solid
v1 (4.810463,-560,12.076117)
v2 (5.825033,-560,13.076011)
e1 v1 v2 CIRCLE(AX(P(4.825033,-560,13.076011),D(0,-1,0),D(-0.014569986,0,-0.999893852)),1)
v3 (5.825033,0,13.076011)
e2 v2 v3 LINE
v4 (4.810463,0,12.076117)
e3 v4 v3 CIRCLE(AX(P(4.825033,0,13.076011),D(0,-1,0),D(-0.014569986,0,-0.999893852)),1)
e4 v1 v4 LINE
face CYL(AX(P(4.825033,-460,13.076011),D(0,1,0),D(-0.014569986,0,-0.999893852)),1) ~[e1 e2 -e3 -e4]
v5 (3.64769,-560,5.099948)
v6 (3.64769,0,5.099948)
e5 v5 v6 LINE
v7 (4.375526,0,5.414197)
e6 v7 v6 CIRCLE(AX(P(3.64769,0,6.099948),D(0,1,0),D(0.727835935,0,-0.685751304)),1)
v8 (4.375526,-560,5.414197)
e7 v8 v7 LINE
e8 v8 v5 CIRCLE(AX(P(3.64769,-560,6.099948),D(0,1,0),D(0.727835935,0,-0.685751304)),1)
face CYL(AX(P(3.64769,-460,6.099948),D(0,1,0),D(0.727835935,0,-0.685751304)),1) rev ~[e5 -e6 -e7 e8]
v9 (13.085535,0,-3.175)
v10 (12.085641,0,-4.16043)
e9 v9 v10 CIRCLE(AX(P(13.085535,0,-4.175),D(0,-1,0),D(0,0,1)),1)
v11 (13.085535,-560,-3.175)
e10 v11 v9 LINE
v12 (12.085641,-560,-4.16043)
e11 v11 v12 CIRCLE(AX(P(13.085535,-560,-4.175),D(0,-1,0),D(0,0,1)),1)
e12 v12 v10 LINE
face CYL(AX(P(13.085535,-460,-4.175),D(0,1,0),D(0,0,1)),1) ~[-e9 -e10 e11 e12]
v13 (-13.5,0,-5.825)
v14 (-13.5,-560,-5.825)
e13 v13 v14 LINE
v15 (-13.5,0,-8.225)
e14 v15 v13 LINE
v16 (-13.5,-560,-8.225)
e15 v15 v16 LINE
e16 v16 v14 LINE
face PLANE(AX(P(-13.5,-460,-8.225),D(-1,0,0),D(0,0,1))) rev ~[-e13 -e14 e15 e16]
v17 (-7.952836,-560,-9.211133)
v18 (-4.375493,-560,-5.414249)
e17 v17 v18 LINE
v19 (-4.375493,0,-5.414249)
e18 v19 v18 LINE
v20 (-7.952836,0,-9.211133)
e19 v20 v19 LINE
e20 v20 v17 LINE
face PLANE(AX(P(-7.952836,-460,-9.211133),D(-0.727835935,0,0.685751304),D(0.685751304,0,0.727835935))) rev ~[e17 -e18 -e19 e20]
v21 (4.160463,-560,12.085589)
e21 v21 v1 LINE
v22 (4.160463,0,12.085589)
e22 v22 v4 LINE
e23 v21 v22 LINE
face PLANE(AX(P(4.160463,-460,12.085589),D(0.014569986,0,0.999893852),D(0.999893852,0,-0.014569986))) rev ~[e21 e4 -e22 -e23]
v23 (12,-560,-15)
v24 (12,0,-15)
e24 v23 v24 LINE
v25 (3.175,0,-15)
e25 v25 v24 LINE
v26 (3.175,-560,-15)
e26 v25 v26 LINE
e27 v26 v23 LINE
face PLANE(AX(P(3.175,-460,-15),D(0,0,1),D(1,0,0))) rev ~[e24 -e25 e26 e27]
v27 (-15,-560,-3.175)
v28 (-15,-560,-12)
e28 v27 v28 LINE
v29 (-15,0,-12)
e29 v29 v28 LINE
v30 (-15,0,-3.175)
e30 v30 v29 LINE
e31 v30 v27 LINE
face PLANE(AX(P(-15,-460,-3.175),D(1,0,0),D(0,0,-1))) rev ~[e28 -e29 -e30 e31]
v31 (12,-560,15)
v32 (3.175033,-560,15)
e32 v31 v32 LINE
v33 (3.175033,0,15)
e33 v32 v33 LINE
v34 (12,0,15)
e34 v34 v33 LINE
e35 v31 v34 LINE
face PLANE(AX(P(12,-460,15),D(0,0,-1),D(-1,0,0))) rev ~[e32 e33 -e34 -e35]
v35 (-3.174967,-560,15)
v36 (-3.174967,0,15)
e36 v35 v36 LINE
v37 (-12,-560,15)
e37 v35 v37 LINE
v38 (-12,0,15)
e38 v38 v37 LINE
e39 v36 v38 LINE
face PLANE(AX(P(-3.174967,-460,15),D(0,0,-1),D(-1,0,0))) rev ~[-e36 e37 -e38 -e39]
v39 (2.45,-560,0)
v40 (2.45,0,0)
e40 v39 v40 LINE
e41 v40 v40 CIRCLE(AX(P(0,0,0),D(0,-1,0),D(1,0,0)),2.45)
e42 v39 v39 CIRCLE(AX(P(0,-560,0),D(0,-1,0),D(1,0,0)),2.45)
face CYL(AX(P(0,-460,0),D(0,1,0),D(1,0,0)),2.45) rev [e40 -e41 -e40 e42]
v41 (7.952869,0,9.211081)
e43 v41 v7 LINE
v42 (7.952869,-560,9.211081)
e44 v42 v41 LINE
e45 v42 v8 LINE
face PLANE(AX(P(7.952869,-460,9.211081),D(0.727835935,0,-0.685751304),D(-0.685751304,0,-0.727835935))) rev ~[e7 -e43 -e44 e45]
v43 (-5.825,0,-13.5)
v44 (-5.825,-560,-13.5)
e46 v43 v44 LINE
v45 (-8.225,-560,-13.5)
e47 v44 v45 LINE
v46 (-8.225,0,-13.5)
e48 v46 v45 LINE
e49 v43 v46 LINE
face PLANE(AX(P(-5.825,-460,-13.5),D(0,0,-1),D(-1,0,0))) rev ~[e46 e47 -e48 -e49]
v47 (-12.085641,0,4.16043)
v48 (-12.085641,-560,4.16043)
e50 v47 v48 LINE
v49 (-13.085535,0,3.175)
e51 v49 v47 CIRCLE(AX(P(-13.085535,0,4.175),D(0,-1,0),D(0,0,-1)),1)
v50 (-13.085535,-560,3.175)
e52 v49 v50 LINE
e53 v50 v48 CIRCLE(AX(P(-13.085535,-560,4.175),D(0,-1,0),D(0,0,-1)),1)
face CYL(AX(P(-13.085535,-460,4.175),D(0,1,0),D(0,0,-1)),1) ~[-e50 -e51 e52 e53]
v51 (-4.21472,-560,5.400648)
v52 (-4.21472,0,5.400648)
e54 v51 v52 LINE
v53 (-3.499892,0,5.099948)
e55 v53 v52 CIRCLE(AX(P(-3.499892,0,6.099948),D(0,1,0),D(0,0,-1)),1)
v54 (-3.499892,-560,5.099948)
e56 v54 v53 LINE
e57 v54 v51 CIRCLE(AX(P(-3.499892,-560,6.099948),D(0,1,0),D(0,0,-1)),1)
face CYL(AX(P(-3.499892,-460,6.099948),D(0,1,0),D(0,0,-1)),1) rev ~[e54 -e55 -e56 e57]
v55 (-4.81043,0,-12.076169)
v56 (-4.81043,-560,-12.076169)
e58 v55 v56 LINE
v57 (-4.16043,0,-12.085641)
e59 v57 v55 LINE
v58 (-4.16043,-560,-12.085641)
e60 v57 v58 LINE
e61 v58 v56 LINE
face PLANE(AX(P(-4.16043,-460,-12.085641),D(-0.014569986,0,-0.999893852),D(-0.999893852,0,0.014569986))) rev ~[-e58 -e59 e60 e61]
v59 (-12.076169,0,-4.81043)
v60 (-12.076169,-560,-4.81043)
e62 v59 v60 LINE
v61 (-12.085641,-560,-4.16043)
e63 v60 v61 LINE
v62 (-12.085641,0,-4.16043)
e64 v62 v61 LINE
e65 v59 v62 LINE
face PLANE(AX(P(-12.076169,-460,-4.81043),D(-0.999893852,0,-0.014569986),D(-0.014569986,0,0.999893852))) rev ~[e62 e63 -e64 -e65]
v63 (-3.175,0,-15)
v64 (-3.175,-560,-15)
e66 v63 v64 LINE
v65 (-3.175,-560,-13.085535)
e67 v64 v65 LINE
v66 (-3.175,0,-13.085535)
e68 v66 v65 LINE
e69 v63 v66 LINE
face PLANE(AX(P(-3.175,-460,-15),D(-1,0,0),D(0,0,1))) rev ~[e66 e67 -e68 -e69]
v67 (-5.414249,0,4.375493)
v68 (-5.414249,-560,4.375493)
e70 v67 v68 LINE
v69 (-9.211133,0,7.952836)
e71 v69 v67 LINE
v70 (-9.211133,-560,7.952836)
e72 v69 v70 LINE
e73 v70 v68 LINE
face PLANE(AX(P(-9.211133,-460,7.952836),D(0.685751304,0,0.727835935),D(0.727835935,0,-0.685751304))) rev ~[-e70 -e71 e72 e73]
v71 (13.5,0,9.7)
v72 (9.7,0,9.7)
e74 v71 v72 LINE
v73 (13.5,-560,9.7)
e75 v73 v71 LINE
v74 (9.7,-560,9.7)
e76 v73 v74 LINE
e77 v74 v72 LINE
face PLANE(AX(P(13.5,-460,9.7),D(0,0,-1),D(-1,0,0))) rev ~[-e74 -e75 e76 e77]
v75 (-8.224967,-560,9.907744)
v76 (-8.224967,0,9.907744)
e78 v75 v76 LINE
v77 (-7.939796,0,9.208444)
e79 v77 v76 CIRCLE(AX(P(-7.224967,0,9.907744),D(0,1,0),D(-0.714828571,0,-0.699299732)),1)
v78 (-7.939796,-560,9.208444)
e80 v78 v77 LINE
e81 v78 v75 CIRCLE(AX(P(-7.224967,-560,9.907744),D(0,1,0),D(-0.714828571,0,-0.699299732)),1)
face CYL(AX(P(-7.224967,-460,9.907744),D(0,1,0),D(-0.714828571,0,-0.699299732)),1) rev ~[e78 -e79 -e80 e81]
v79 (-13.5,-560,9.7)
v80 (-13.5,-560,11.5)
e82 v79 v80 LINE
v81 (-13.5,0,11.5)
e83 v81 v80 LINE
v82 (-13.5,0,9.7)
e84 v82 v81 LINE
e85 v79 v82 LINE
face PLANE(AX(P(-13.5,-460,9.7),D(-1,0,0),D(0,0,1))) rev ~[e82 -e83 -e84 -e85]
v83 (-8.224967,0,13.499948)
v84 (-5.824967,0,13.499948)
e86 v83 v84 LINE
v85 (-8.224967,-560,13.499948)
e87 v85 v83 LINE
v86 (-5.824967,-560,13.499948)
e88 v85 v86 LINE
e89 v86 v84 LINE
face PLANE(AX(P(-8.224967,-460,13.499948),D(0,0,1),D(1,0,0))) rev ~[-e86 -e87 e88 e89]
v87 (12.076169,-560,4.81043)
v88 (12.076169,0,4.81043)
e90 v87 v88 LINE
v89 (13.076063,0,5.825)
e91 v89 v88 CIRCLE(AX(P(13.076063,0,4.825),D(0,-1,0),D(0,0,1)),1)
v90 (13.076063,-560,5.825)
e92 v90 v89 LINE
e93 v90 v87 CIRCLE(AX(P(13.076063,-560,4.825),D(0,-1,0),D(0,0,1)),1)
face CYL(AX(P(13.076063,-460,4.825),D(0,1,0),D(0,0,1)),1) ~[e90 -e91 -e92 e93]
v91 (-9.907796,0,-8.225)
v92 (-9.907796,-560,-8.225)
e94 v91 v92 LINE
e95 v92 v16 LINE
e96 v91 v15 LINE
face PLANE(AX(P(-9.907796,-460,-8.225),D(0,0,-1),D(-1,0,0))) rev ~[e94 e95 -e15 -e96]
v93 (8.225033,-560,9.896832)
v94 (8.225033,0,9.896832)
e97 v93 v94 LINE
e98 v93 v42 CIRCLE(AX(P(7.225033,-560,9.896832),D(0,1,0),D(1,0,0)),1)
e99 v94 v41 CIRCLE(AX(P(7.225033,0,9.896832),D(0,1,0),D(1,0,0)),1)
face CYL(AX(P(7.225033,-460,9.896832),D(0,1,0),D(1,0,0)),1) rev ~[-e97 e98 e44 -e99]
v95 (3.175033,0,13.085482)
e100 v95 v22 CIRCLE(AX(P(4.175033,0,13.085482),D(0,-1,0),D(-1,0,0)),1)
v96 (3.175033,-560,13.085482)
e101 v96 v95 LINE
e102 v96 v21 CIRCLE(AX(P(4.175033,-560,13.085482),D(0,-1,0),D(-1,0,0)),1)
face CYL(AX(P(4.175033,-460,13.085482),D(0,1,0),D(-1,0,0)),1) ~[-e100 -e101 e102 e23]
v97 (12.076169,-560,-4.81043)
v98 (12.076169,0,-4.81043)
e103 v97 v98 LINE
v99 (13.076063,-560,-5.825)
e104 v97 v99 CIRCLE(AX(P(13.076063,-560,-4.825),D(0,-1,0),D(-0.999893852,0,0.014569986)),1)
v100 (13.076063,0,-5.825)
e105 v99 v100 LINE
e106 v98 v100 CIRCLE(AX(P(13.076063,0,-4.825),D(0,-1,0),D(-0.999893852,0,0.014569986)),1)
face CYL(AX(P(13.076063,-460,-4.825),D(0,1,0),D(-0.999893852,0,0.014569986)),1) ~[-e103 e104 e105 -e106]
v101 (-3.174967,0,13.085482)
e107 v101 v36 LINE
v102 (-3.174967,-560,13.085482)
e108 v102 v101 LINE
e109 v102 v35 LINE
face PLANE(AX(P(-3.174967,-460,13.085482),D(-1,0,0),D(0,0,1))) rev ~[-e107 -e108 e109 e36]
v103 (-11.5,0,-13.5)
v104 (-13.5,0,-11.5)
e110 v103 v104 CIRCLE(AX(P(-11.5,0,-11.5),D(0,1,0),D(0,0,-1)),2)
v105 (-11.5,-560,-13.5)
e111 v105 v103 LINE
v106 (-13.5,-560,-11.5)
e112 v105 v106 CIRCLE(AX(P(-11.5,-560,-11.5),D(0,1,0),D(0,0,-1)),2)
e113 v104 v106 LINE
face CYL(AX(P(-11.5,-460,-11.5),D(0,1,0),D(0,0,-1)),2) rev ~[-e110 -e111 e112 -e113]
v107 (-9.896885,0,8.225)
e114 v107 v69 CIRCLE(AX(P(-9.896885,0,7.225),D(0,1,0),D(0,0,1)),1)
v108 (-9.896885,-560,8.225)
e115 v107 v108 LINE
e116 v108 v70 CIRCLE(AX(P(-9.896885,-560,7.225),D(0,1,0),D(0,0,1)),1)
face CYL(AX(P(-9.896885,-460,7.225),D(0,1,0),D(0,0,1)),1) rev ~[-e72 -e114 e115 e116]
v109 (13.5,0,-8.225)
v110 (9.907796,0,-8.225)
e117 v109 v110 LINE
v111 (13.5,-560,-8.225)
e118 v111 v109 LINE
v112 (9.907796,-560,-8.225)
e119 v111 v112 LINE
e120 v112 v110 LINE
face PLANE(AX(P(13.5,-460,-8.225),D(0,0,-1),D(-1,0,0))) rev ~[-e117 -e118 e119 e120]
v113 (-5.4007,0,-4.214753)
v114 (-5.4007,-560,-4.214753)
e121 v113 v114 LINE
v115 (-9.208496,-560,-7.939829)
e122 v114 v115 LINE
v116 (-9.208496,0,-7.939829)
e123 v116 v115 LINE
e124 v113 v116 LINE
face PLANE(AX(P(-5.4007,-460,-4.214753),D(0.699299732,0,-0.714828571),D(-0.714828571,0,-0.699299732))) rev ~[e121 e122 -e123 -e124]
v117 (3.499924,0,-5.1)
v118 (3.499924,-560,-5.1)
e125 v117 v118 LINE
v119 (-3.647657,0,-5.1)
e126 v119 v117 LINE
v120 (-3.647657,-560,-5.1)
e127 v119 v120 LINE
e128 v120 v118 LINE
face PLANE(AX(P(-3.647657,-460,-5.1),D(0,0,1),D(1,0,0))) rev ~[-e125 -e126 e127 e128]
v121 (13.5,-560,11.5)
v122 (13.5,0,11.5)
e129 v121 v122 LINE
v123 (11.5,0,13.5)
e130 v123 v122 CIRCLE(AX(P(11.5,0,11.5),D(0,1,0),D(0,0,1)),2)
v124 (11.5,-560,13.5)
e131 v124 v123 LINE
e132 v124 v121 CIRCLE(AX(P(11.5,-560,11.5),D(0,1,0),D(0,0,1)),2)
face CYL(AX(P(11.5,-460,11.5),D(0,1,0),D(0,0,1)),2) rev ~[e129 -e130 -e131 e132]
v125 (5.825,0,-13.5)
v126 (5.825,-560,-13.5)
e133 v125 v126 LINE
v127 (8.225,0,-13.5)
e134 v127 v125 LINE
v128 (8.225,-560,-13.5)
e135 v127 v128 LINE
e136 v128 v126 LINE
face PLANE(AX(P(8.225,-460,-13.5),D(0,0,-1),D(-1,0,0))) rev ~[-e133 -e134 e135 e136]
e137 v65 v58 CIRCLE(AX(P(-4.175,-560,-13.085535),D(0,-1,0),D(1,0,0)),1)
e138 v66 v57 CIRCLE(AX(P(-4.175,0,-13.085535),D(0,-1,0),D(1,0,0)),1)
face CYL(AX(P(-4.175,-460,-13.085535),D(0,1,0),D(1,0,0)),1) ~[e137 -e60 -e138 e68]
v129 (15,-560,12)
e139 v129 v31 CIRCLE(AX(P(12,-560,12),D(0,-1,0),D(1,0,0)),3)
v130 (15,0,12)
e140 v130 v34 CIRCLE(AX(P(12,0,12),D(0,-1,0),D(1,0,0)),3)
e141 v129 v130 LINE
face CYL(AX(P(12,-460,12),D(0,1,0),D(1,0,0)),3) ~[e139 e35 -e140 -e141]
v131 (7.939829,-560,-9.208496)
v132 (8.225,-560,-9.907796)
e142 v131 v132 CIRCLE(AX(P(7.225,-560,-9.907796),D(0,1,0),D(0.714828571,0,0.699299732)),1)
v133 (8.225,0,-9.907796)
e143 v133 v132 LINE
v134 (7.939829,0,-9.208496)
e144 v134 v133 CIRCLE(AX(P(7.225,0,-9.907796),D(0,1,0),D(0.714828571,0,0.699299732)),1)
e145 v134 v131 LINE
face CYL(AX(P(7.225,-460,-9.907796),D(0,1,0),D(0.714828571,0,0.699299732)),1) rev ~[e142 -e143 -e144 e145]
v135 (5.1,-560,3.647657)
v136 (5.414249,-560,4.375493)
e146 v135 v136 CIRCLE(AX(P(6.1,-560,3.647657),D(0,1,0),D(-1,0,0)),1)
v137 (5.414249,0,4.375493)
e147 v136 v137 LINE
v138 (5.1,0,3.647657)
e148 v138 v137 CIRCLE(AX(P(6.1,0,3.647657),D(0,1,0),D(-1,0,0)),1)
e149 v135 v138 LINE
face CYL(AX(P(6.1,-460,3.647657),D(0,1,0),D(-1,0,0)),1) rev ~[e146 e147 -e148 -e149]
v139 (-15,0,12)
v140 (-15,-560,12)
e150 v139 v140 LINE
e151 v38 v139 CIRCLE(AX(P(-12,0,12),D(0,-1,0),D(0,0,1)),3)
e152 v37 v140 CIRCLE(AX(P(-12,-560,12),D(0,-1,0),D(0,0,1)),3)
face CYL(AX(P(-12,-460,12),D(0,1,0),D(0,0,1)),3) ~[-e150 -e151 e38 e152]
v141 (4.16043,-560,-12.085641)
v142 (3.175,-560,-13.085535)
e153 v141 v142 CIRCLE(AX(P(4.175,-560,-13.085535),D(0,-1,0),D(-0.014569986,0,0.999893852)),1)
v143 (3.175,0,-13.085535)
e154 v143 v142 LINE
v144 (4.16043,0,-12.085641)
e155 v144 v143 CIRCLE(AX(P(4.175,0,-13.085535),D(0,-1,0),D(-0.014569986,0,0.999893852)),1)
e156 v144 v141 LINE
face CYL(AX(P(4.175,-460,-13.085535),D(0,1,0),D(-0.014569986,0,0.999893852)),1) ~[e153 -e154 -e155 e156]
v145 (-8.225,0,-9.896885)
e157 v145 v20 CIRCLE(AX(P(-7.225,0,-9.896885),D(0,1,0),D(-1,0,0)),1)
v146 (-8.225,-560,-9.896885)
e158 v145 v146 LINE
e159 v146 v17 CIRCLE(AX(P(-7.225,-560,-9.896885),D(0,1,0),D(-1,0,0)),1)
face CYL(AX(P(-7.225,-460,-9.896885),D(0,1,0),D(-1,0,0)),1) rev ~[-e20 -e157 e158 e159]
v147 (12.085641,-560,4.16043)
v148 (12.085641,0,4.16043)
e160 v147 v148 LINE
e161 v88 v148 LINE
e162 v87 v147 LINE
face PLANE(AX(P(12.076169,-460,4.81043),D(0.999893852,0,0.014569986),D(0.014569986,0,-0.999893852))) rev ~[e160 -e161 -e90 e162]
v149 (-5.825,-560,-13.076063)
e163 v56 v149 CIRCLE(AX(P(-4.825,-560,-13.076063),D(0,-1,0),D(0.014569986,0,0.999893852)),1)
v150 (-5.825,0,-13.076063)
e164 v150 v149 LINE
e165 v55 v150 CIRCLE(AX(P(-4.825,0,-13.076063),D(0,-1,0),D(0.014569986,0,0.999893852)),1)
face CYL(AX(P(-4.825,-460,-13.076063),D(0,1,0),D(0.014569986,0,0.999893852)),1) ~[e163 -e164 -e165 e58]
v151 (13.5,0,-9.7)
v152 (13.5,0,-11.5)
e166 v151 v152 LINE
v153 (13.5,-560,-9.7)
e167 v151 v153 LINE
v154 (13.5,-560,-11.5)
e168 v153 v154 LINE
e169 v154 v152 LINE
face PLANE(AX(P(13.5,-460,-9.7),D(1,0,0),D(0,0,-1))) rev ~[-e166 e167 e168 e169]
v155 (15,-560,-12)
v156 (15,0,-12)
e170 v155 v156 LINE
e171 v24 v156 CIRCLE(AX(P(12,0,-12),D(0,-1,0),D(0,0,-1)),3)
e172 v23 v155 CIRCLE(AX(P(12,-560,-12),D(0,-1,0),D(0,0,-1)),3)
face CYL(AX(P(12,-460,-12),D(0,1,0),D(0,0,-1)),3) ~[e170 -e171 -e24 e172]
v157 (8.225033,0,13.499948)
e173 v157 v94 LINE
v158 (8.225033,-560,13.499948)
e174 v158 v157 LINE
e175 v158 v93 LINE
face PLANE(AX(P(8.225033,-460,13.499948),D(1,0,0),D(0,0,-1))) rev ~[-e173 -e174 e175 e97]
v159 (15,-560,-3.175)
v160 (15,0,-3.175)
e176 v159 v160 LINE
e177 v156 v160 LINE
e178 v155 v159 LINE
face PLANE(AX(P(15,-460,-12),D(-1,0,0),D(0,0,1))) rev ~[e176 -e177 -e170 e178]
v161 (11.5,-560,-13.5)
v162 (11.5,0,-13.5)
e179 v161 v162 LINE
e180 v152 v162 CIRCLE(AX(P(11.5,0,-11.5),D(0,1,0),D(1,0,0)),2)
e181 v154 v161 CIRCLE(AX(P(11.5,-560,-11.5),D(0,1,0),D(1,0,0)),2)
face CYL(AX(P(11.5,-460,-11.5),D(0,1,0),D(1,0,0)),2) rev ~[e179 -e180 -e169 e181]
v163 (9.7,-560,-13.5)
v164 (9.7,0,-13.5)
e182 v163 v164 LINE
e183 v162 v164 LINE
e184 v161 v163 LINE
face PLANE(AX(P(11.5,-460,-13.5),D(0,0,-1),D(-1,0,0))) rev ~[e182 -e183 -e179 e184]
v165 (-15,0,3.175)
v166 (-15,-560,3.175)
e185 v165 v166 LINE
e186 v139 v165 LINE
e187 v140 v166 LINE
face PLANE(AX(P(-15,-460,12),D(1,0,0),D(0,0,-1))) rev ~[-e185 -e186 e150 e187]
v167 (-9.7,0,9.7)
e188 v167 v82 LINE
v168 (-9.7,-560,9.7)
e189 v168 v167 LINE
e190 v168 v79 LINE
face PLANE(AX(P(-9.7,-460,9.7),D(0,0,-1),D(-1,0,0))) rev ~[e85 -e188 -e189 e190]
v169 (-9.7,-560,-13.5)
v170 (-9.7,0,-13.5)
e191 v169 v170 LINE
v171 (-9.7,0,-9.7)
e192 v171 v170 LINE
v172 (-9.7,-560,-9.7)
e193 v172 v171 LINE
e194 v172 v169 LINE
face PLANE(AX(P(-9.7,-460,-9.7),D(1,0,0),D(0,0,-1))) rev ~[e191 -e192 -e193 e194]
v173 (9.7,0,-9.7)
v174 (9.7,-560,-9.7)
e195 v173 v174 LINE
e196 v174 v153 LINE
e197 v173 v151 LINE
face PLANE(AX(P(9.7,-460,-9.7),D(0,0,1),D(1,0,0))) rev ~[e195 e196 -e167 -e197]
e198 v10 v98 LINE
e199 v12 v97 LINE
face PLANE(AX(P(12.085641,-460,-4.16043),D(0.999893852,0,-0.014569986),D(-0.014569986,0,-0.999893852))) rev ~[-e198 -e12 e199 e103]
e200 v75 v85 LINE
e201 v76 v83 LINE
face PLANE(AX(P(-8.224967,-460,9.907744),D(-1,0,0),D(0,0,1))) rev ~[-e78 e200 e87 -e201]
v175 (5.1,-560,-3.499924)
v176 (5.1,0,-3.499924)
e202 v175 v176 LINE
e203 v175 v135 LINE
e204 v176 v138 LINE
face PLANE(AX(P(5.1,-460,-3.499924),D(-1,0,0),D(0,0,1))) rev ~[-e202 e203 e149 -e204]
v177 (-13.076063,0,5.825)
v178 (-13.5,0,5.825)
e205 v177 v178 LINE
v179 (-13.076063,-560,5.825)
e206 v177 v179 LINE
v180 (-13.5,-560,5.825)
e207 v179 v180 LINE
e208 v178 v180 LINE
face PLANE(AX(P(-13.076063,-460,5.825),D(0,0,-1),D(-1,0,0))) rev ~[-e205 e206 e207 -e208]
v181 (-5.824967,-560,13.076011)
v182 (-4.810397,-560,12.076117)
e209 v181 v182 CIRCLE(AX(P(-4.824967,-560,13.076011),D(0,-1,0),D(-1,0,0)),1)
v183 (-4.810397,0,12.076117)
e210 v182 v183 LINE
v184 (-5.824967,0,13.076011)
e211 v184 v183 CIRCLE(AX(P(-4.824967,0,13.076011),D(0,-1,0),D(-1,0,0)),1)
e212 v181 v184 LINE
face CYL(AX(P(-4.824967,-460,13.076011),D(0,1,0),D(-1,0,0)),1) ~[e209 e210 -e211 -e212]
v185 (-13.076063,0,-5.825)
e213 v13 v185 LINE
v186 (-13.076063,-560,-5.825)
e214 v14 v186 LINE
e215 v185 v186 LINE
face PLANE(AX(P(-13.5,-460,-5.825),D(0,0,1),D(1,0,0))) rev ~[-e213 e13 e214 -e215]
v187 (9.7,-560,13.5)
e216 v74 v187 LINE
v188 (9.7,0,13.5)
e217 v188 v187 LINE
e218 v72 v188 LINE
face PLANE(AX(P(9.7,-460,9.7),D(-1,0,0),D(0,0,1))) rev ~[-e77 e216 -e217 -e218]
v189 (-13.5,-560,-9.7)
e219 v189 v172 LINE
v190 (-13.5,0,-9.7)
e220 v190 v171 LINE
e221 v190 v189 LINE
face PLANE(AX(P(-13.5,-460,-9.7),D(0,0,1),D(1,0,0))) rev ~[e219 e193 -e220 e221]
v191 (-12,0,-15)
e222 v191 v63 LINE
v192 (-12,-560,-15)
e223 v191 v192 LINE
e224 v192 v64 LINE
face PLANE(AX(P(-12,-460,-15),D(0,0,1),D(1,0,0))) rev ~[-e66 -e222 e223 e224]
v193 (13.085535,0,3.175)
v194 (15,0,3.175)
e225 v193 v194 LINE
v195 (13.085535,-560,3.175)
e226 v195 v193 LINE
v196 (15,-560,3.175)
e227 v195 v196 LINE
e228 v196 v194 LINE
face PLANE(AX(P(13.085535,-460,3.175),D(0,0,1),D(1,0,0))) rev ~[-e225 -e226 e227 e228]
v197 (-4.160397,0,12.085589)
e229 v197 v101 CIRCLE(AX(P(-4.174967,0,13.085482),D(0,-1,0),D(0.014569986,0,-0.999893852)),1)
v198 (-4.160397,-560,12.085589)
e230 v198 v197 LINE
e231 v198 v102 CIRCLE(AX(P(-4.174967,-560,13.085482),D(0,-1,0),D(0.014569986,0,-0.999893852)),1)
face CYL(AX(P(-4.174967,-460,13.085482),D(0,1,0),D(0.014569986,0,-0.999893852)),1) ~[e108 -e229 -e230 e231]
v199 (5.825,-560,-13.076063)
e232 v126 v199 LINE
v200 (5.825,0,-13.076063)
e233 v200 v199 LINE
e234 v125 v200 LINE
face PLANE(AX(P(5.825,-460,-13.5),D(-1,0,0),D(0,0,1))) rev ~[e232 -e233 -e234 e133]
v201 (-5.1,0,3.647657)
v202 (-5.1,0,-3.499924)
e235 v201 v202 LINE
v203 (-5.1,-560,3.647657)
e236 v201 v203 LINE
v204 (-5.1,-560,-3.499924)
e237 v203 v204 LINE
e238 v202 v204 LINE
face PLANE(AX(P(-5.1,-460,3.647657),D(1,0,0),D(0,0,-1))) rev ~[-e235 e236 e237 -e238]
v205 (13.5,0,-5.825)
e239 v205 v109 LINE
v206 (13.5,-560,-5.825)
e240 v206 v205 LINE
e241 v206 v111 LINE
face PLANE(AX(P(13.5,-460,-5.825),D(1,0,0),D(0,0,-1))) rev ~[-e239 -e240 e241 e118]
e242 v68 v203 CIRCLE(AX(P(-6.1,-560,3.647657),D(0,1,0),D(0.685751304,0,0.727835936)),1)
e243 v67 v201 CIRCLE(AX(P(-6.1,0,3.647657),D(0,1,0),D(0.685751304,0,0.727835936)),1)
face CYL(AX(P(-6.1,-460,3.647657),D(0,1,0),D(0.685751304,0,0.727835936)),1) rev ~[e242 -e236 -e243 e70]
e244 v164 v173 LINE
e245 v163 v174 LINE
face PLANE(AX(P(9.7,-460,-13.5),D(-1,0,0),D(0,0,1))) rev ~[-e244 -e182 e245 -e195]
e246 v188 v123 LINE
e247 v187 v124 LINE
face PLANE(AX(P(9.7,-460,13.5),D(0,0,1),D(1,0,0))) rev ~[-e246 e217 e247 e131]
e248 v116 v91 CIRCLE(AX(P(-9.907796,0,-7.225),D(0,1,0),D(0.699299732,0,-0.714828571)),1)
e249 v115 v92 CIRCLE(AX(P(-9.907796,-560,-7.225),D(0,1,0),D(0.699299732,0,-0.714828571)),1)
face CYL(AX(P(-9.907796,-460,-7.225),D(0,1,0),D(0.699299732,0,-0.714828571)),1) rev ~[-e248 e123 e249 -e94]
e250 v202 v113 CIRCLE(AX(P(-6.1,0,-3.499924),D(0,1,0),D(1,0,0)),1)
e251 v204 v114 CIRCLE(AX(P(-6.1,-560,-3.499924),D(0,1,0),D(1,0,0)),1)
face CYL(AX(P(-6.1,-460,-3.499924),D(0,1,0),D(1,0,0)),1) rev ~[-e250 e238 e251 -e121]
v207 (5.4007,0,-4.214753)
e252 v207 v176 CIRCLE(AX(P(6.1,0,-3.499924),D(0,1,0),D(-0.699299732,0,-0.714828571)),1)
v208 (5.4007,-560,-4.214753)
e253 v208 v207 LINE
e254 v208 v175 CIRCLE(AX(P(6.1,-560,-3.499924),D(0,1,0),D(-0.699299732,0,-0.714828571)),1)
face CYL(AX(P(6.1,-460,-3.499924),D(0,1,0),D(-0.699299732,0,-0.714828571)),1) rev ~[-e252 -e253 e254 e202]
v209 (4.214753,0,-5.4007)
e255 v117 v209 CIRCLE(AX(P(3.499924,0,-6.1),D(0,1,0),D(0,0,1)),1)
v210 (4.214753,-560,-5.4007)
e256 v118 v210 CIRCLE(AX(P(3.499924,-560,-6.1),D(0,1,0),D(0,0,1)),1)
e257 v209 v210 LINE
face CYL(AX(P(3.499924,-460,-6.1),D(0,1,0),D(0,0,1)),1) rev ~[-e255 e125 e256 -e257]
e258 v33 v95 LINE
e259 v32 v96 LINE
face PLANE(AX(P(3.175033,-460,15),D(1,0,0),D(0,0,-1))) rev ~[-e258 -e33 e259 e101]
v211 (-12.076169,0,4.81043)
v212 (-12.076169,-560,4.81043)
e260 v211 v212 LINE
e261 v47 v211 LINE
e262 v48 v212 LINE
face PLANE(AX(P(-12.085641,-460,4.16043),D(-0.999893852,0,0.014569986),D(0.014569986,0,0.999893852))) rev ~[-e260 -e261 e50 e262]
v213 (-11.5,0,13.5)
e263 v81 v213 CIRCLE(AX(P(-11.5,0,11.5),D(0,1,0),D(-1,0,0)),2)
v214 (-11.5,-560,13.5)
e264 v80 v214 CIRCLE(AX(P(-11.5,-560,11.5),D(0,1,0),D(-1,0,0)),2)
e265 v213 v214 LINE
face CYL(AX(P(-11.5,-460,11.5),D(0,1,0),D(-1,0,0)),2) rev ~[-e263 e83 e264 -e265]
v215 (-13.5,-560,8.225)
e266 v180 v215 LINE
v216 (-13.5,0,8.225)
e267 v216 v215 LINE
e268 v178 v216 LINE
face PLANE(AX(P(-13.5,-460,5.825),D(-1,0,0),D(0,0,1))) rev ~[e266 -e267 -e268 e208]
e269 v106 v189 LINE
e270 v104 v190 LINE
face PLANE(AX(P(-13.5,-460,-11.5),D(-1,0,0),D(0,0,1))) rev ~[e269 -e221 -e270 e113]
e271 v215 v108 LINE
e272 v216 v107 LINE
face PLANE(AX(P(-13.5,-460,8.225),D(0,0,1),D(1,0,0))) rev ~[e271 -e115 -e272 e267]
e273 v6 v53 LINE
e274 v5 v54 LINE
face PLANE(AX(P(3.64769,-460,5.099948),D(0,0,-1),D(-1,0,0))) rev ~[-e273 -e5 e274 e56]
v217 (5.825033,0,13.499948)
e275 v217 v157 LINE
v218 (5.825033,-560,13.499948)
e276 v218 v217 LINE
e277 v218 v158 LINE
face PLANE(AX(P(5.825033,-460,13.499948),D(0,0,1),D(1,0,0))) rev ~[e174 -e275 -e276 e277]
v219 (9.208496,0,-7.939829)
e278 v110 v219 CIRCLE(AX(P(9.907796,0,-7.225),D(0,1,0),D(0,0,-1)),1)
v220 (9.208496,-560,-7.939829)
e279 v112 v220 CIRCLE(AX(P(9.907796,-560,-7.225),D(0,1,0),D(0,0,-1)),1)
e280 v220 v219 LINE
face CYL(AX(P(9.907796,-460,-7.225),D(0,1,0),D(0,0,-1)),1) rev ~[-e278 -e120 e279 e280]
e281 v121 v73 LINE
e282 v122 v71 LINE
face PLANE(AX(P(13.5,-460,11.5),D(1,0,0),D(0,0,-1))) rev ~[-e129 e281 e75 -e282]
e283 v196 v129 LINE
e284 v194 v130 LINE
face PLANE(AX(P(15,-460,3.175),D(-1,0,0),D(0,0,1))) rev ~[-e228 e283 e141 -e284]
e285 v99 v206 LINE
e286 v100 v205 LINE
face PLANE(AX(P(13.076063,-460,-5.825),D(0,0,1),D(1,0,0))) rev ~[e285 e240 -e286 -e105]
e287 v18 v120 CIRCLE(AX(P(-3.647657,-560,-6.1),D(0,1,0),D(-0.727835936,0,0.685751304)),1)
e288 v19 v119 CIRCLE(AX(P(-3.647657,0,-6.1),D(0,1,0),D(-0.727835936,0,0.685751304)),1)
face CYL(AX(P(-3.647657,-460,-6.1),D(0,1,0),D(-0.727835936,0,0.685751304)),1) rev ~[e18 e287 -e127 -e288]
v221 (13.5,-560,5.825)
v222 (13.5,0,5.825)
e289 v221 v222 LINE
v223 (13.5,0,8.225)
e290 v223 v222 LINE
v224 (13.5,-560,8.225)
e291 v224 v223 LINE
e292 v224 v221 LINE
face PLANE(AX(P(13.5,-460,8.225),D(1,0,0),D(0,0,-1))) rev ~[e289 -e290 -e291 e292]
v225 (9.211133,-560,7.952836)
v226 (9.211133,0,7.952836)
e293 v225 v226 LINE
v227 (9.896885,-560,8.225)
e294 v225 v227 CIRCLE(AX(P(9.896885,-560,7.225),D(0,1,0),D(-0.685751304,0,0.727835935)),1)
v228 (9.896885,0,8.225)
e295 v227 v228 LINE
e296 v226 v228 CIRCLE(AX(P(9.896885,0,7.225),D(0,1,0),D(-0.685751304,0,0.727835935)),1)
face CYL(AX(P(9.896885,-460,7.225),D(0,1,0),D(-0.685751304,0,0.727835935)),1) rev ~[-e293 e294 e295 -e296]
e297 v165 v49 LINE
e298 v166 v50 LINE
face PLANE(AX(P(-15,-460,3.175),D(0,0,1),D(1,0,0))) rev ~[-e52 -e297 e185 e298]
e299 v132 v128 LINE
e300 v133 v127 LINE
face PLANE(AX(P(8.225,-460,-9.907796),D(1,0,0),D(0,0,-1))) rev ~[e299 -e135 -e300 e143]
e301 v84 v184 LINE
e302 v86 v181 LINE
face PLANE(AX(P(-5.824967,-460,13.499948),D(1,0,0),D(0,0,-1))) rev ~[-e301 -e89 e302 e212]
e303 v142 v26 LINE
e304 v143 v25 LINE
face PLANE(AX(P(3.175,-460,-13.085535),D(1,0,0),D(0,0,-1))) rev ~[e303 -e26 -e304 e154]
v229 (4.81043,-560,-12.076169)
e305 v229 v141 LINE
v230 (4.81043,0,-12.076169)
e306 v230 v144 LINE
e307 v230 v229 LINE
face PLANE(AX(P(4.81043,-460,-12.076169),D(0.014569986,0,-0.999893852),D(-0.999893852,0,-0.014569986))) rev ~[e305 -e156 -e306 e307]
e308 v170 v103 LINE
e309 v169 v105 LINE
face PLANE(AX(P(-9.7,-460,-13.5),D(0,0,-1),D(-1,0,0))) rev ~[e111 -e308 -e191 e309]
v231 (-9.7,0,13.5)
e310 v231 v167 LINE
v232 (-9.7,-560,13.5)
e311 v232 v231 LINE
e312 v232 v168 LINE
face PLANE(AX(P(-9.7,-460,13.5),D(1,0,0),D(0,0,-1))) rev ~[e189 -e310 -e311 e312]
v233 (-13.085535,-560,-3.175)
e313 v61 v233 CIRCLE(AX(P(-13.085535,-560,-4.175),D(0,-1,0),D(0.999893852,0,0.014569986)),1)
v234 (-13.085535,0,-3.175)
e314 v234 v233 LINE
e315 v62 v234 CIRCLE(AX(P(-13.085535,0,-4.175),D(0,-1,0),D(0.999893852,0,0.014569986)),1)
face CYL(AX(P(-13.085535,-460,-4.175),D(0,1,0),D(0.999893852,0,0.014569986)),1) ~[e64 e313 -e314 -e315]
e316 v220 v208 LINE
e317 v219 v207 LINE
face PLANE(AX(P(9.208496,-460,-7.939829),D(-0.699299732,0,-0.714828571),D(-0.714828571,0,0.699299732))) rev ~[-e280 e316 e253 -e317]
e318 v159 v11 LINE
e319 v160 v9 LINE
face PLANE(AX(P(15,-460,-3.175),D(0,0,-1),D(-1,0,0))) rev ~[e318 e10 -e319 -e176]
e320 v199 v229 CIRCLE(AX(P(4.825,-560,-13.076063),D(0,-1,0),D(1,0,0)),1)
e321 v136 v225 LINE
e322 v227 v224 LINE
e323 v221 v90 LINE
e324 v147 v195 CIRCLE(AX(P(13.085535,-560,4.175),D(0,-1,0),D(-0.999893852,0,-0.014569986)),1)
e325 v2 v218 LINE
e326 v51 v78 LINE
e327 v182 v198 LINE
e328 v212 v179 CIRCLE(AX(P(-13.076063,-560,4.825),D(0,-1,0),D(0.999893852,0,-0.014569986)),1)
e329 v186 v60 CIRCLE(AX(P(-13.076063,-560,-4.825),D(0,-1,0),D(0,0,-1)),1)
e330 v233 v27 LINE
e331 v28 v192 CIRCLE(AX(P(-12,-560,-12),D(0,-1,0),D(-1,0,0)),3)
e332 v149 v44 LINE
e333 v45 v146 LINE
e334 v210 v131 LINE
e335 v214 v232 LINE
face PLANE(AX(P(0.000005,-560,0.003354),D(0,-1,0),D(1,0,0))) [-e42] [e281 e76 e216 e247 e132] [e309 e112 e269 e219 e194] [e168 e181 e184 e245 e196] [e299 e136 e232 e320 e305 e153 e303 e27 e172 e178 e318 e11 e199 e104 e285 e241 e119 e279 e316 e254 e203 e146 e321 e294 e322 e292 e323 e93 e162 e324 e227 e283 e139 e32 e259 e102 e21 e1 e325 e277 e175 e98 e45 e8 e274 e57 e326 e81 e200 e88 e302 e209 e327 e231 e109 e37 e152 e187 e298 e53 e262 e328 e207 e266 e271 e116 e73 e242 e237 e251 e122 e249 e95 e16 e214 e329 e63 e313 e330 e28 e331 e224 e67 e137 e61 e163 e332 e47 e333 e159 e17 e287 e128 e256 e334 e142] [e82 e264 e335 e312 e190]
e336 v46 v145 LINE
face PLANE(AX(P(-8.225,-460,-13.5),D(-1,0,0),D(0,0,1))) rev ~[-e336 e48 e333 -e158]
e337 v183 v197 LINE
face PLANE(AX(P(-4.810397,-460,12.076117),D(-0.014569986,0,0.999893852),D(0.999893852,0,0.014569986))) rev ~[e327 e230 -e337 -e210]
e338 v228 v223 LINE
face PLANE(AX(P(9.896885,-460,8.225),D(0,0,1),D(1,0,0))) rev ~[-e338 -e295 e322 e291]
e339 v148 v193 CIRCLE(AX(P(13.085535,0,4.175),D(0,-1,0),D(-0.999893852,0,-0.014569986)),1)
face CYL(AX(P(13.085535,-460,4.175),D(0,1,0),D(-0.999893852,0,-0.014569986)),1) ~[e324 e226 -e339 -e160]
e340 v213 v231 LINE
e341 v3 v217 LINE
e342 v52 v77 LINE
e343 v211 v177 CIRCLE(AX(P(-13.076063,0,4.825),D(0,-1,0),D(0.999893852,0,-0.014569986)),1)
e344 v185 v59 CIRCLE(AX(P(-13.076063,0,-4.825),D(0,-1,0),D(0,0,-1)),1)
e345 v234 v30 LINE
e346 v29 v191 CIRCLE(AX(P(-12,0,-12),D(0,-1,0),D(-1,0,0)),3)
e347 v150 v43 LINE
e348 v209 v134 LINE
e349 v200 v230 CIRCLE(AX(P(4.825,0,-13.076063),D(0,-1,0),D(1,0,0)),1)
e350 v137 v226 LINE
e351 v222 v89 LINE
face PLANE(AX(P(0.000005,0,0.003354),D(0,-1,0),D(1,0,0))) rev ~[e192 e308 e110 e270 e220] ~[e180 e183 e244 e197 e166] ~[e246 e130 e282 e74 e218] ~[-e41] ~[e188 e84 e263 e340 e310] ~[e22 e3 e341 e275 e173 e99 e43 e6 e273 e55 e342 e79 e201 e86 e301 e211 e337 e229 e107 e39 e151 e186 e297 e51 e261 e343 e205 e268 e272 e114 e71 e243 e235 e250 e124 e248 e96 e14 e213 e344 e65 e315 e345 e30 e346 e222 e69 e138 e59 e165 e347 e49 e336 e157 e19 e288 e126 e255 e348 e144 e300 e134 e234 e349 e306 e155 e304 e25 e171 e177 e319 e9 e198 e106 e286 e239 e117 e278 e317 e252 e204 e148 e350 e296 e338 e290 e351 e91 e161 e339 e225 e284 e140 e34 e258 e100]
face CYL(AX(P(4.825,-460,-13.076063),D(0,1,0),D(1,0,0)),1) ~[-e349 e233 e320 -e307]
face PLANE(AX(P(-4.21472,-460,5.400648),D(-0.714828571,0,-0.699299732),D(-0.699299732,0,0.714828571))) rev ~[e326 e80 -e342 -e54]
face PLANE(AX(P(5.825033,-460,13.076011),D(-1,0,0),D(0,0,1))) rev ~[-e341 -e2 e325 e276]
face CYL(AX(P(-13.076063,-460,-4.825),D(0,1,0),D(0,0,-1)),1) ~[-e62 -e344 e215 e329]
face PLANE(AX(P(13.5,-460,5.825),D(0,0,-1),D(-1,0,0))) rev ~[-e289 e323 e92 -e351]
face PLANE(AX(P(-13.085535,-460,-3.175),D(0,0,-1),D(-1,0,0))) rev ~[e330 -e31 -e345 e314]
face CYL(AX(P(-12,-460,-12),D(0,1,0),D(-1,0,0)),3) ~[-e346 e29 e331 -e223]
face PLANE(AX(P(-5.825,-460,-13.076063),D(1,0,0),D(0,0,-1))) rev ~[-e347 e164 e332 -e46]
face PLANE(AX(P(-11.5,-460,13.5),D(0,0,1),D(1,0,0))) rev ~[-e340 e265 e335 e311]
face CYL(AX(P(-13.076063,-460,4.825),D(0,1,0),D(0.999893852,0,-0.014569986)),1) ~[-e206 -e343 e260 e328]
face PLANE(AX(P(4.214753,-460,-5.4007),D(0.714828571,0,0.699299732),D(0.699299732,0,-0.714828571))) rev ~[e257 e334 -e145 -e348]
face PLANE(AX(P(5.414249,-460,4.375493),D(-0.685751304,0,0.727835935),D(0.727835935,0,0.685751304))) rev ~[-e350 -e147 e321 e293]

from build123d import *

# Parameters (mm, degrees)
F0_R     = 2.45
F1_DEPTH = 460
F2_DEPTH = 100


# Not quite as in the source:
# - ends of sketch curves that miss each other by under 0.0002 mm in the source are joined


with BuildPart() as f1:
    # F0 (on Front) → F1 (new body)
    with BuildSketch(Plane.XZ):
        with BuildLine():
            Line((-3.1749674082, 15), (-12, 15))
            ThreePointArc((-12, 15), (-14.1213203436, 14.1213203436), (-15, 12))
            Line((-15, 12), (-15, 3.175))
            Line((-15, 3.175), (-13.0855346263, 3.175))
            ThreePointArc((-13.0855346263, 3.175), (-12.3835980145, 3.4627605788), (-12.0856407741, 4.1604300138))
            Line((-12.0856407741, 4.1604300138), (-12.0761692778, 4.8104300138))
            ThreePointArc((-12.0761692778, 4.8104300138), (-12.3638237087, 5.5269366118), (-13.0760631299, 5.825))
            Line((-13.0760631299, 5.825), (-13.5, 5.825))
            Line((-13.5, 5.825), (-13.5, 8.225))
            Line((-13.5, 8.225), (-9.8968845016, 8.225))
            ThreePointArc((-9.8968845016, 8.225), (-9.5279915195, 8.1544718757), (-9.2111331975, 7.9528359354))
            Line((-9.2111331975, 7.9528359354), (-5.4142486959, 4.3754933338))
            ThreePointArc((-5.4142486959, 4.3754933338), (-5.1819174045, 4.0440465354), (-5.1, 3.6476573984))
            Line((-5.1, 3.6476573984), (-5.1, -3.4999243287))
            ThreePointArc((-5.1, -3.4999243287), (-5.1782354607, -3.8876744211), (-5.4007002683, -4.2147528992))
            Line((-5.4007002683, -4.2147528992), (-9.2084959767, -7.9398285705))
            ThreePointArc((-9.2084959767, -7.9398285705), (-9.5301904718, -8.1509666761), (-9.9077957084, -8.225))
            Line((-9.9077957084, -8.225), (-13.5, -8.225))
            Line((-13.5, -8.225), (-13.5, -5.825))
            Line((-13.5, -5.825), (-13.0760631299, -5.825))
            ThreePointArc((-13.0760631299, -5.825), (-12.3638237087, -5.5269366118), (-12.0761692778, -4.8104300138))
            Line((-12.0761692778, -4.8104300138), (-12.0856407741, -4.1604300138))
            ThreePointArc((-12.0856407741, -4.1604300138), (-12.3835980145, -3.4627605788), (-13.0855346263, -3.175))
            Line((-13.0855346263, -3.175), (-15, -3.175))
            Line((-15, -3.175), (-15, -12))
            ThreePointArc((-15, -12), (-14.1213203436, -14.1213203436), (-12, -15))
            Line((-12, -15), (-3.175, -15))
            Line((-3.175, -15), (-3.175, -13.0855346263))
            ThreePointArc((-3.175, -13.0855346263), (-3.4627605788, -12.3835980145), (-4.1604300138, -12.0856407741))
            Line((-4.1604300138, -12.0856407741), (-4.8104300138, -12.0761692778))
            ThreePointArc((-4.8104300138, -12.0761692778), (-5.5269366118, -12.3638237087), (-5.825, -13.0760631299))
            Line((-5.825, -13.0760631299), (-5.825, -13.5))
            Line((-5.825, -13.5), (-8.225, -13.5))
            Line((-8.225, -13.5), (-8.225, -9.8968845016))
            ThreePointArc((-8.225, -9.8968845016), (-8.1544718757, -9.5279915195), (-7.9528359354, -9.2111331975))
            Line((-7.9528359354, -9.2111331975), (-4.3754933338, -5.4142486959))
            ThreePointArc((-4.3754933338, -5.4142486959), (-4.0440465354, -5.1819174045), (-3.6476573984, -5.1))
            Line((-3.6476573984, -5.1), (3.4999243287, -5.1))
            ThreePointArc((3.4999243287, -5.1), (3.8876744211, -5.1782354607), (4.2147528992, -5.4007002683))
            Line((4.2147528992, -5.4007002683), (7.9398285705, -9.2084959767))
            ThreePointArc((7.9398285705, -9.2084959767), (8.1509666761, -9.5301904718), (8.225, -9.9077957084))
            Line((8.225, -9.9077957084), (8.225, -13.5))
            Line((8.225, -13.5), (5.825, -13.5))
            Line((5.825, -13.5), (5.825, -13.0760631299))
            ThreePointArc((5.825, -13.0760631299), (5.5269366118, -12.3638237087), (4.8104300138, -12.0761692778))
            Line((4.8104300138, -12.0761692778), (4.1604300138, -12.0856407741))
            ThreePointArc((4.1604300138, -12.0856407741), (3.4627605788, -12.3835980145), (3.175, -13.0855346263))
            Line((3.175, -13.0855346263), (3.175, -15))
            Line((3.175, -15), (12, -15))
            ThreePointArc((12, -15), (14.1213203436, -14.1213203436), (15, -12))
            Line((15, -12), (15, -3.175))
            Line((15, -3.175), (13.0855346263, -3.175))
            ThreePointArc((13.0855346263, -3.175), (12.3835980145, -3.4627605788), (12.0856407741, -4.1604300138))
            Line((12.0856407741, -4.1604300138), (12.0761692778, -4.8104300138))
            ThreePointArc((12.0761692778, -4.8104300138), (12.3638237087, -5.5269366118), (13.0760631299, -5.825))
            Line((13.0760631299, -5.825), (13.5, -5.825))
            Line((13.5, -5.825), (13.5, -8.225))
            Line((13.5, -8.225), (9.9077957084, -8.225))
            ThreePointArc((9.9077957084, -8.225), (9.5301904718, -8.1509666761), (9.2084959767, -7.9398285705))
            Line((9.2084959767, -7.9398285705), (5.4007002683, -4.2147528992))
            ThreePointArc((5.4007002683, -4.2147528992), (5.1782354607, -3.8876744211), (5.1, -3.4999243287))
            Line((5.1, -3.4999243287), (5.1, 3.6476573984))
            ThreePointArc((5.1, 3.6476573984), (5.1819174045, 4.0440465354), (5.4142486959, 4.3754933338))
            Line((5.4142486959, 4.3754933338), (9.2111331975, 7.9528359354))
            ThreePointArc((9.2111331975, 7.9528359354), (9.5279915195, 8.1544718757), (9.8968845016, 8.225))
            Line((9.8968845016, 8.225), (13.5, 8.225))
            Line((13.5, 8.225), (13.5, 5.825))
            Line((13.5, 5.825), (13.0760631299, 5.825))
            ThreePointArc((13.0760631299, 5.825), (12.3638237087, 5.5269366118), (12.0761692778, 4.8104300138))
            Line((12.0761692778, 4.8104300138), (12.0856407741, 4.1604300138))
            ThreePointArc((12.0856407741, 4.1604300138), (12.3835980145, 3.4627605788), (13.0855346263, 3.175))
            Line((13.0855346263, 3.175), (15, 3.175))
            Line((15, 3.175), (15, 12))
            ThreePointArc((15, 12), (14.1213203436, 14.1213203436), (12, 15))
            Line((12, 15), (3.1750325918, 15))
            Line((3.1750325918, 15), (3.1750325918, 13.0854824722))
            ThreePointArc((3.1750325918, 13.0854824722), (3.4627931706, 12.3835458604), (4.1604626057, 12.0855886201))
            Line((4.1604626057, 12.0855886201), (4.8104626057, 12.0761171237))
            ThreePointArc((4.8104626057, 12.0761171237), (5.5269692036, 12.3637715546), (5.8250325918, 13.0760109758))
            Line((5.8250325918, 13.0760109758), (5.8250325918, 13.4999478459))
            Line((5.8250325918, 13.4999478459), (8.2250325918, 13.4999478459))
            Line((8.2250325918, 13.4999478459), (8.2250325918, 9.8968323476))
            ThreePointArc((8.2250325918, 9.8968323476), (8.1545044675, 9.5279393654), (7.9528685272, 9.2110810434))
            Line((7.9528685272, 9.2110810434), (4.3755259256, 5.4141965418))
            ThreePointArc((4.3755259256, 5.4141965418), (4.0440791272, 5.1818652505), (3.6476899902, 5.0999478459))
            Line((3.6476899902, 5.0999478459), (-3.4998917369, 5.0999478459))
            ThreePointArc((-3.4998917369, 5.0999478459), (-3.8876418293, 5.1781833067), (-4.2147203074, 5.4006481142))
            Line((-4.2147203074, 5.4006481142), (-7.9397959787, 9.2084438226))
            ThreePointArc((-7.9397959787, 9.2084438226), (-8.1509340843, 9.5301383177), (-8.2249674082, 9.9077435543))
            Line((-8.2249674082, 9.9077435543), (-8.2249674082, 13.4999478459))
            Line((-8.2249674082, 13.4999478459), (-5.8249674082, 13.4999478459))
            Line((-5.8249674082, 13.4999478459), (-5.8249674082, 13.0760109758))
            ThreePointArc((-5.8249674082, 13.0760109758), (-5.5269040199, 12.3637715546), (-4.810397422, 12.0761171237))
            Line((-4.810397422, 12.0761171237), (-4.160397422, 12.0855886201))
            ThreePointArc((-4.160397422, 12.0855886201), (-3.462727987, 12.3835458604), (-3.1749674082, 13.0854824722))
            Line((-3.1749674082, 13.0854824722), (-3.1749674082, 15))
        make_face()
        with BuildLine():
            Line((-13.5, -11.5), (-13.5, -9.7))
            Line((-13.5, -9.7), (-9.7, -9.7))
            Line((-9.7, -9.7), (-9.7, -13.5))
            Line((-9.7, -13.5), (-11.5, -13.5))
            ThreePointArc((-11.5, -13.5), (-12.9142135624, -12.9142135624), (-13.5, -11.5))
        make_face(mode=Mode.SUBTRACT)
        with BuildLine():
            Line((9.7, -9.7), (13.5, -9.7))
            Line((13.5, -9.7), (13.5, -11.5))
            ThreePointArc((13.5, -11.5), (12.9142135624, -12.9142135624), (11.5, -13.5))
            Line((11.5, -13.5), (9.7, -13.5))
            Line((9.7, -13.5), (9.7, -9.7))
        make_face(mode=Mode.SUBTRACT)
        with BuildLine():
            ThreePointArc((-13.5, 11.5), (-12.9142135624, 12.9142135624), (-11.5, 13.5))
            Line((-11.5, 13.5), (-9.7, 13.5))
            Line((-9.7, 13.5), (-9.7, 9.7))
            Line((-9.7, 9.7), (-13.5, 9.7))
            Line((-13.5, 9.7), (-13.5, 11.5))
        make_face(mode=Mode.SUBTRACT)
        Circle(F0_R, mode=Mode.SUBTRACT)
        with BuildLine():
            Line((9.7, 13.5), (11.5, 13.5))
            ThreePointArc((11.5, 13.5), (12.9142135624, 12.9142135624), (13.5, 11.5))
            Line((13.5, 11.5), (13.5, 9.7))
            Line((13.5, 9.7), (9.7, 9.7))
            Line((9.7, 9.7), (9.7, 13.5))
        make_face(mode=Mode.SUBTRACT)
    extrude(amount=F1_DEPTH)

    # F2 (add): a face of the model
    f2_faces = [f1.faces().sort_by_distance(p)[0] for p in [
        (5.2291627207, -460, 12.6659491494),
    ]]
    extrude(f2_faces, amount=F2_DEPTH)


solid = f1.part
